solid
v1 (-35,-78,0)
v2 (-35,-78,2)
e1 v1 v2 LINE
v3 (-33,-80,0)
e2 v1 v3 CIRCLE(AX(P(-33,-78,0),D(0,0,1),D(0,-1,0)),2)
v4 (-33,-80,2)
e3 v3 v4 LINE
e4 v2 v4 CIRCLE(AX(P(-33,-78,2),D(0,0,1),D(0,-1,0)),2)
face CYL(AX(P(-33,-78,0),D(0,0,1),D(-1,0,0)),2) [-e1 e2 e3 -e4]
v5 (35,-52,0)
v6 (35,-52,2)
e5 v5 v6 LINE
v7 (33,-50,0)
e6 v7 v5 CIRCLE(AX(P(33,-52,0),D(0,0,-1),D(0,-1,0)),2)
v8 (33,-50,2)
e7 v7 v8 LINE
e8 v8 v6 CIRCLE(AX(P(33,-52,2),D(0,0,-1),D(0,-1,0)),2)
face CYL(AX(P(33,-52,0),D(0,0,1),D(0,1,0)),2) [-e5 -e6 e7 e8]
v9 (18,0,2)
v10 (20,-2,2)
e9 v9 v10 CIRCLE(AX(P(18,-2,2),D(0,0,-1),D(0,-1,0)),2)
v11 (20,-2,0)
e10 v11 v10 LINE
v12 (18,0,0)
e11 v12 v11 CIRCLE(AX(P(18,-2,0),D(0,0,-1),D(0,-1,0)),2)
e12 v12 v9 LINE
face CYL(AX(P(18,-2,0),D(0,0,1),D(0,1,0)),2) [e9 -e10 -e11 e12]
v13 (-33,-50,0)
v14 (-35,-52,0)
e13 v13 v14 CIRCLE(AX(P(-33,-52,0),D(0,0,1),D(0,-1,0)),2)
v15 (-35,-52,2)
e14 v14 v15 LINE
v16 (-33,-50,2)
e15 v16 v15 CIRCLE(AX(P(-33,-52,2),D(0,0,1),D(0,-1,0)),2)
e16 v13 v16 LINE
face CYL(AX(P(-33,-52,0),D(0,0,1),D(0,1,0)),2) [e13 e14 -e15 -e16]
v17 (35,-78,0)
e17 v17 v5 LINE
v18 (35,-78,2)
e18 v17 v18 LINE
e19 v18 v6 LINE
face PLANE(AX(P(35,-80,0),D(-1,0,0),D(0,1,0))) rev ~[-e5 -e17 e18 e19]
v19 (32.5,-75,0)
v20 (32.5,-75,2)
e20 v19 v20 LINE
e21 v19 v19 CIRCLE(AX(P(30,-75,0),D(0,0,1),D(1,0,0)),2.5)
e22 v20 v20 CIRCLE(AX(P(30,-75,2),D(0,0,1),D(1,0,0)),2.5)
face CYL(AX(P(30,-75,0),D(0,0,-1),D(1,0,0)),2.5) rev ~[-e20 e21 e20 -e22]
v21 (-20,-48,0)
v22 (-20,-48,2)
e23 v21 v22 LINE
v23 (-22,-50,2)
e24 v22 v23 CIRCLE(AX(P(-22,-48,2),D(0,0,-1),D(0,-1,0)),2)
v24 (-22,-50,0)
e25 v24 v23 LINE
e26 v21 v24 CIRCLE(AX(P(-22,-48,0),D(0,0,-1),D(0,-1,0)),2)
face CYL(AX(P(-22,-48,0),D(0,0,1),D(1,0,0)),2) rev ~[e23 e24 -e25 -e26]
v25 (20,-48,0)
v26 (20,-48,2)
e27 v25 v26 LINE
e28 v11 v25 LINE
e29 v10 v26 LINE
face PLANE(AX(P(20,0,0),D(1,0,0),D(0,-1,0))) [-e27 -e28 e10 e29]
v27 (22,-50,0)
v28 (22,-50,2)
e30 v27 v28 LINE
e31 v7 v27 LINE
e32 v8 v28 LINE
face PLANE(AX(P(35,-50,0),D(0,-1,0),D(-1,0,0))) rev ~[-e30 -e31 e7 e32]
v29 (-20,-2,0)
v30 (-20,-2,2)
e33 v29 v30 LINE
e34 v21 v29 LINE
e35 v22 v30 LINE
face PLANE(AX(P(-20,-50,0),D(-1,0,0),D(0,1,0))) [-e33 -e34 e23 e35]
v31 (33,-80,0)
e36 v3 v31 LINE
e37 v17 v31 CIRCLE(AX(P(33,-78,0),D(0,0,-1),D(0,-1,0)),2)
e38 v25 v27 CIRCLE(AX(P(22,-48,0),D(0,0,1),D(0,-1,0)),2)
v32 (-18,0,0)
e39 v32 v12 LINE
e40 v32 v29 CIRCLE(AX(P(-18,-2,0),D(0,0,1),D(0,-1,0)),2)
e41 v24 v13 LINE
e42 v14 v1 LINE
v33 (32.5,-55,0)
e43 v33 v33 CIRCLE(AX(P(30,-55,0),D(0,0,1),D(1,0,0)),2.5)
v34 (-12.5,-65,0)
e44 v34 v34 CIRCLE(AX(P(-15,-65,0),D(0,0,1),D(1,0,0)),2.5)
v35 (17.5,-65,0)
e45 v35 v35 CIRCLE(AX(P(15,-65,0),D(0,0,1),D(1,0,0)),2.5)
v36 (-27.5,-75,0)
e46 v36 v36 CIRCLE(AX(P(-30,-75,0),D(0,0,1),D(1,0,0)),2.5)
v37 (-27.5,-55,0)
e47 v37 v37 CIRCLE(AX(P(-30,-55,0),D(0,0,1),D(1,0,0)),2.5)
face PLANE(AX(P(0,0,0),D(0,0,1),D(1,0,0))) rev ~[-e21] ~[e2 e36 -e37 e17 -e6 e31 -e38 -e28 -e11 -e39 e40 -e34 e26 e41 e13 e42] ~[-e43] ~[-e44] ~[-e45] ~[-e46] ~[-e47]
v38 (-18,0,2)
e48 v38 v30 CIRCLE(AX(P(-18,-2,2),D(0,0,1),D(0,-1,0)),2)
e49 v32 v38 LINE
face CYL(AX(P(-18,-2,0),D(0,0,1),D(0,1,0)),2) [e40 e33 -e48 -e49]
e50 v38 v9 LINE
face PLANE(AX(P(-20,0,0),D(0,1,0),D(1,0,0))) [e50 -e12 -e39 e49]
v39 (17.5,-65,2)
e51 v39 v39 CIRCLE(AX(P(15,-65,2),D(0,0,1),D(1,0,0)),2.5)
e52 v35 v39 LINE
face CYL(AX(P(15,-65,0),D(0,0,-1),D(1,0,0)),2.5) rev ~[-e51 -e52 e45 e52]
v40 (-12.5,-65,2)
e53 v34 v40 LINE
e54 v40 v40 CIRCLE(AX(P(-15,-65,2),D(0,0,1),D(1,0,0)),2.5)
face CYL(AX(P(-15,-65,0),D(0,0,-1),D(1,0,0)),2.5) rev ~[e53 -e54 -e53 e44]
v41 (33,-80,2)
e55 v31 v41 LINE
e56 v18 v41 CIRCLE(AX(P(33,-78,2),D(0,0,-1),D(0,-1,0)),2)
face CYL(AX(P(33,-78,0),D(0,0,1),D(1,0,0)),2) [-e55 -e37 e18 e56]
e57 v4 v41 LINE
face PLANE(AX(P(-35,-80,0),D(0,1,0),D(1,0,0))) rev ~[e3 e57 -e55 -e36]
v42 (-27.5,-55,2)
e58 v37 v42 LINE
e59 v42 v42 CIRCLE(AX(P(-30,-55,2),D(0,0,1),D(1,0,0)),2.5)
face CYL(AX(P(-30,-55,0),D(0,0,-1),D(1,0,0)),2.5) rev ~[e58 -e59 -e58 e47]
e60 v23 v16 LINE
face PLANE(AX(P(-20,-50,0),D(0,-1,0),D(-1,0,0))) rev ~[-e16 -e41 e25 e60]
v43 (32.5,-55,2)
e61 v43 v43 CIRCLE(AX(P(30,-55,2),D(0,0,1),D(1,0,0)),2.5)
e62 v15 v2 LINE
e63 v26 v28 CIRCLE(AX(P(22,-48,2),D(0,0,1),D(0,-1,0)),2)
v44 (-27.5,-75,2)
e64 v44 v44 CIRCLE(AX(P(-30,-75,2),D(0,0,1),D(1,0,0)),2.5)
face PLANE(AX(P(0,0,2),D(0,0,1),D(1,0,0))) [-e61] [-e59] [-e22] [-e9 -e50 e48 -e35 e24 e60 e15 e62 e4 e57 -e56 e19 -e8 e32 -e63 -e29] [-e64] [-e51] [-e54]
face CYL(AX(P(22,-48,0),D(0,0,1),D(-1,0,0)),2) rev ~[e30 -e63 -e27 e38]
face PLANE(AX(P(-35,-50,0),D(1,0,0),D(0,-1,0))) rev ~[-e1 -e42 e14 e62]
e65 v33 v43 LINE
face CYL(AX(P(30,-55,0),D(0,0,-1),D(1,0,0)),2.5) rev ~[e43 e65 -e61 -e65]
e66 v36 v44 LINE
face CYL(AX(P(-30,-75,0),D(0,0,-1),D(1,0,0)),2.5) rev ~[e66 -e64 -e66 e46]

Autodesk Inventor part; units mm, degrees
ref_plane "YZ Plane" through (0, 0, 0) normal (1, 0, 0) x (0, 1, 0)
ref_plane "XZ Plane" through (0, 0, 0) normal (0, 1, 0) x (-1, 0, 0)
ref_plane "XY Plane" through (0, 0, 0) normal (0, 0, 1) x (1, 0, 0)
sketch "Sketch1" plane through (0, 0, 0) normal (0, 0, 1) x (1, 0, 0)
  line L0 (-20, 0) -> (20, 0)
  line L1 (20, 0) -> (20, -50)
  line L2 (20, -50) -> (-20, -50)
  line L3 (-20, -50) -> (-20, 0)
  line L4 (-35, -80) -> (35, -80)
  line L5 (35, -80) -> (35, -50)
  line L6 (35, -50) -> (-35, -50)
  line L7 (-35, -50) -> (-35, -80)
  circle A0 centre (-15, -65) radius 2.5
  circle A1 centre (15, -65) radius 2.5
  line L8 (0, -80) -> (0, -50) construction
  circle A2 centre (-30, -55) radius 2.5
  circle A3 centre (30, -55) radius 2.5
  circle A4 centre (30, -75) radius 2.5
  circle A5 centre (-30, -75) radius 2.5
  line L9 (-35, -65) -> (35, -65) construction
  point P0 (0, 0)
  point P1 (0, 0)
  dimension "d0" = 40
  dimension "d1" = 50
  dimension "d33" = 70
  dimension "d34" = 5
  dimension "d35" = 30
  dimension "d36" = 30
  dimension "d38" = 5
  dimension "d39" = 5
extrude "Plate1" add sketch "Sketch1" along normal blind 2
fillet "Corner Round1" radius 2 8 edges at (-20, -50, 1) (-35, -50, 1) (20, -50, 1) (35, -50, 1) (35, -80, 1) (-35, -80, 1) (-20, 0, 1) (20, 0, 1)
equation "\"d2\" = Thickness"
equation "\"BendReliefWidth\" = Thickness"
equation "\"BendReliefDepth\" = 0.5 * Thickness"
equation "\"CornerReliefSize\" = 4 * Thickness"
equation "\"MinimumRemnant\" = 2 * Thickness"
equation "\"TransitionRadius\" = BendRadius"
equation "\"JacobiRadiusSize\" = BendRadius"
equation "\"GapSize\" = Thickness"
equation "\"Thickness\" = 2"
equation "\"BendRadius\" = 2.75"
properties part number "NDM 11.030 plate" material "Stainless Steel"
